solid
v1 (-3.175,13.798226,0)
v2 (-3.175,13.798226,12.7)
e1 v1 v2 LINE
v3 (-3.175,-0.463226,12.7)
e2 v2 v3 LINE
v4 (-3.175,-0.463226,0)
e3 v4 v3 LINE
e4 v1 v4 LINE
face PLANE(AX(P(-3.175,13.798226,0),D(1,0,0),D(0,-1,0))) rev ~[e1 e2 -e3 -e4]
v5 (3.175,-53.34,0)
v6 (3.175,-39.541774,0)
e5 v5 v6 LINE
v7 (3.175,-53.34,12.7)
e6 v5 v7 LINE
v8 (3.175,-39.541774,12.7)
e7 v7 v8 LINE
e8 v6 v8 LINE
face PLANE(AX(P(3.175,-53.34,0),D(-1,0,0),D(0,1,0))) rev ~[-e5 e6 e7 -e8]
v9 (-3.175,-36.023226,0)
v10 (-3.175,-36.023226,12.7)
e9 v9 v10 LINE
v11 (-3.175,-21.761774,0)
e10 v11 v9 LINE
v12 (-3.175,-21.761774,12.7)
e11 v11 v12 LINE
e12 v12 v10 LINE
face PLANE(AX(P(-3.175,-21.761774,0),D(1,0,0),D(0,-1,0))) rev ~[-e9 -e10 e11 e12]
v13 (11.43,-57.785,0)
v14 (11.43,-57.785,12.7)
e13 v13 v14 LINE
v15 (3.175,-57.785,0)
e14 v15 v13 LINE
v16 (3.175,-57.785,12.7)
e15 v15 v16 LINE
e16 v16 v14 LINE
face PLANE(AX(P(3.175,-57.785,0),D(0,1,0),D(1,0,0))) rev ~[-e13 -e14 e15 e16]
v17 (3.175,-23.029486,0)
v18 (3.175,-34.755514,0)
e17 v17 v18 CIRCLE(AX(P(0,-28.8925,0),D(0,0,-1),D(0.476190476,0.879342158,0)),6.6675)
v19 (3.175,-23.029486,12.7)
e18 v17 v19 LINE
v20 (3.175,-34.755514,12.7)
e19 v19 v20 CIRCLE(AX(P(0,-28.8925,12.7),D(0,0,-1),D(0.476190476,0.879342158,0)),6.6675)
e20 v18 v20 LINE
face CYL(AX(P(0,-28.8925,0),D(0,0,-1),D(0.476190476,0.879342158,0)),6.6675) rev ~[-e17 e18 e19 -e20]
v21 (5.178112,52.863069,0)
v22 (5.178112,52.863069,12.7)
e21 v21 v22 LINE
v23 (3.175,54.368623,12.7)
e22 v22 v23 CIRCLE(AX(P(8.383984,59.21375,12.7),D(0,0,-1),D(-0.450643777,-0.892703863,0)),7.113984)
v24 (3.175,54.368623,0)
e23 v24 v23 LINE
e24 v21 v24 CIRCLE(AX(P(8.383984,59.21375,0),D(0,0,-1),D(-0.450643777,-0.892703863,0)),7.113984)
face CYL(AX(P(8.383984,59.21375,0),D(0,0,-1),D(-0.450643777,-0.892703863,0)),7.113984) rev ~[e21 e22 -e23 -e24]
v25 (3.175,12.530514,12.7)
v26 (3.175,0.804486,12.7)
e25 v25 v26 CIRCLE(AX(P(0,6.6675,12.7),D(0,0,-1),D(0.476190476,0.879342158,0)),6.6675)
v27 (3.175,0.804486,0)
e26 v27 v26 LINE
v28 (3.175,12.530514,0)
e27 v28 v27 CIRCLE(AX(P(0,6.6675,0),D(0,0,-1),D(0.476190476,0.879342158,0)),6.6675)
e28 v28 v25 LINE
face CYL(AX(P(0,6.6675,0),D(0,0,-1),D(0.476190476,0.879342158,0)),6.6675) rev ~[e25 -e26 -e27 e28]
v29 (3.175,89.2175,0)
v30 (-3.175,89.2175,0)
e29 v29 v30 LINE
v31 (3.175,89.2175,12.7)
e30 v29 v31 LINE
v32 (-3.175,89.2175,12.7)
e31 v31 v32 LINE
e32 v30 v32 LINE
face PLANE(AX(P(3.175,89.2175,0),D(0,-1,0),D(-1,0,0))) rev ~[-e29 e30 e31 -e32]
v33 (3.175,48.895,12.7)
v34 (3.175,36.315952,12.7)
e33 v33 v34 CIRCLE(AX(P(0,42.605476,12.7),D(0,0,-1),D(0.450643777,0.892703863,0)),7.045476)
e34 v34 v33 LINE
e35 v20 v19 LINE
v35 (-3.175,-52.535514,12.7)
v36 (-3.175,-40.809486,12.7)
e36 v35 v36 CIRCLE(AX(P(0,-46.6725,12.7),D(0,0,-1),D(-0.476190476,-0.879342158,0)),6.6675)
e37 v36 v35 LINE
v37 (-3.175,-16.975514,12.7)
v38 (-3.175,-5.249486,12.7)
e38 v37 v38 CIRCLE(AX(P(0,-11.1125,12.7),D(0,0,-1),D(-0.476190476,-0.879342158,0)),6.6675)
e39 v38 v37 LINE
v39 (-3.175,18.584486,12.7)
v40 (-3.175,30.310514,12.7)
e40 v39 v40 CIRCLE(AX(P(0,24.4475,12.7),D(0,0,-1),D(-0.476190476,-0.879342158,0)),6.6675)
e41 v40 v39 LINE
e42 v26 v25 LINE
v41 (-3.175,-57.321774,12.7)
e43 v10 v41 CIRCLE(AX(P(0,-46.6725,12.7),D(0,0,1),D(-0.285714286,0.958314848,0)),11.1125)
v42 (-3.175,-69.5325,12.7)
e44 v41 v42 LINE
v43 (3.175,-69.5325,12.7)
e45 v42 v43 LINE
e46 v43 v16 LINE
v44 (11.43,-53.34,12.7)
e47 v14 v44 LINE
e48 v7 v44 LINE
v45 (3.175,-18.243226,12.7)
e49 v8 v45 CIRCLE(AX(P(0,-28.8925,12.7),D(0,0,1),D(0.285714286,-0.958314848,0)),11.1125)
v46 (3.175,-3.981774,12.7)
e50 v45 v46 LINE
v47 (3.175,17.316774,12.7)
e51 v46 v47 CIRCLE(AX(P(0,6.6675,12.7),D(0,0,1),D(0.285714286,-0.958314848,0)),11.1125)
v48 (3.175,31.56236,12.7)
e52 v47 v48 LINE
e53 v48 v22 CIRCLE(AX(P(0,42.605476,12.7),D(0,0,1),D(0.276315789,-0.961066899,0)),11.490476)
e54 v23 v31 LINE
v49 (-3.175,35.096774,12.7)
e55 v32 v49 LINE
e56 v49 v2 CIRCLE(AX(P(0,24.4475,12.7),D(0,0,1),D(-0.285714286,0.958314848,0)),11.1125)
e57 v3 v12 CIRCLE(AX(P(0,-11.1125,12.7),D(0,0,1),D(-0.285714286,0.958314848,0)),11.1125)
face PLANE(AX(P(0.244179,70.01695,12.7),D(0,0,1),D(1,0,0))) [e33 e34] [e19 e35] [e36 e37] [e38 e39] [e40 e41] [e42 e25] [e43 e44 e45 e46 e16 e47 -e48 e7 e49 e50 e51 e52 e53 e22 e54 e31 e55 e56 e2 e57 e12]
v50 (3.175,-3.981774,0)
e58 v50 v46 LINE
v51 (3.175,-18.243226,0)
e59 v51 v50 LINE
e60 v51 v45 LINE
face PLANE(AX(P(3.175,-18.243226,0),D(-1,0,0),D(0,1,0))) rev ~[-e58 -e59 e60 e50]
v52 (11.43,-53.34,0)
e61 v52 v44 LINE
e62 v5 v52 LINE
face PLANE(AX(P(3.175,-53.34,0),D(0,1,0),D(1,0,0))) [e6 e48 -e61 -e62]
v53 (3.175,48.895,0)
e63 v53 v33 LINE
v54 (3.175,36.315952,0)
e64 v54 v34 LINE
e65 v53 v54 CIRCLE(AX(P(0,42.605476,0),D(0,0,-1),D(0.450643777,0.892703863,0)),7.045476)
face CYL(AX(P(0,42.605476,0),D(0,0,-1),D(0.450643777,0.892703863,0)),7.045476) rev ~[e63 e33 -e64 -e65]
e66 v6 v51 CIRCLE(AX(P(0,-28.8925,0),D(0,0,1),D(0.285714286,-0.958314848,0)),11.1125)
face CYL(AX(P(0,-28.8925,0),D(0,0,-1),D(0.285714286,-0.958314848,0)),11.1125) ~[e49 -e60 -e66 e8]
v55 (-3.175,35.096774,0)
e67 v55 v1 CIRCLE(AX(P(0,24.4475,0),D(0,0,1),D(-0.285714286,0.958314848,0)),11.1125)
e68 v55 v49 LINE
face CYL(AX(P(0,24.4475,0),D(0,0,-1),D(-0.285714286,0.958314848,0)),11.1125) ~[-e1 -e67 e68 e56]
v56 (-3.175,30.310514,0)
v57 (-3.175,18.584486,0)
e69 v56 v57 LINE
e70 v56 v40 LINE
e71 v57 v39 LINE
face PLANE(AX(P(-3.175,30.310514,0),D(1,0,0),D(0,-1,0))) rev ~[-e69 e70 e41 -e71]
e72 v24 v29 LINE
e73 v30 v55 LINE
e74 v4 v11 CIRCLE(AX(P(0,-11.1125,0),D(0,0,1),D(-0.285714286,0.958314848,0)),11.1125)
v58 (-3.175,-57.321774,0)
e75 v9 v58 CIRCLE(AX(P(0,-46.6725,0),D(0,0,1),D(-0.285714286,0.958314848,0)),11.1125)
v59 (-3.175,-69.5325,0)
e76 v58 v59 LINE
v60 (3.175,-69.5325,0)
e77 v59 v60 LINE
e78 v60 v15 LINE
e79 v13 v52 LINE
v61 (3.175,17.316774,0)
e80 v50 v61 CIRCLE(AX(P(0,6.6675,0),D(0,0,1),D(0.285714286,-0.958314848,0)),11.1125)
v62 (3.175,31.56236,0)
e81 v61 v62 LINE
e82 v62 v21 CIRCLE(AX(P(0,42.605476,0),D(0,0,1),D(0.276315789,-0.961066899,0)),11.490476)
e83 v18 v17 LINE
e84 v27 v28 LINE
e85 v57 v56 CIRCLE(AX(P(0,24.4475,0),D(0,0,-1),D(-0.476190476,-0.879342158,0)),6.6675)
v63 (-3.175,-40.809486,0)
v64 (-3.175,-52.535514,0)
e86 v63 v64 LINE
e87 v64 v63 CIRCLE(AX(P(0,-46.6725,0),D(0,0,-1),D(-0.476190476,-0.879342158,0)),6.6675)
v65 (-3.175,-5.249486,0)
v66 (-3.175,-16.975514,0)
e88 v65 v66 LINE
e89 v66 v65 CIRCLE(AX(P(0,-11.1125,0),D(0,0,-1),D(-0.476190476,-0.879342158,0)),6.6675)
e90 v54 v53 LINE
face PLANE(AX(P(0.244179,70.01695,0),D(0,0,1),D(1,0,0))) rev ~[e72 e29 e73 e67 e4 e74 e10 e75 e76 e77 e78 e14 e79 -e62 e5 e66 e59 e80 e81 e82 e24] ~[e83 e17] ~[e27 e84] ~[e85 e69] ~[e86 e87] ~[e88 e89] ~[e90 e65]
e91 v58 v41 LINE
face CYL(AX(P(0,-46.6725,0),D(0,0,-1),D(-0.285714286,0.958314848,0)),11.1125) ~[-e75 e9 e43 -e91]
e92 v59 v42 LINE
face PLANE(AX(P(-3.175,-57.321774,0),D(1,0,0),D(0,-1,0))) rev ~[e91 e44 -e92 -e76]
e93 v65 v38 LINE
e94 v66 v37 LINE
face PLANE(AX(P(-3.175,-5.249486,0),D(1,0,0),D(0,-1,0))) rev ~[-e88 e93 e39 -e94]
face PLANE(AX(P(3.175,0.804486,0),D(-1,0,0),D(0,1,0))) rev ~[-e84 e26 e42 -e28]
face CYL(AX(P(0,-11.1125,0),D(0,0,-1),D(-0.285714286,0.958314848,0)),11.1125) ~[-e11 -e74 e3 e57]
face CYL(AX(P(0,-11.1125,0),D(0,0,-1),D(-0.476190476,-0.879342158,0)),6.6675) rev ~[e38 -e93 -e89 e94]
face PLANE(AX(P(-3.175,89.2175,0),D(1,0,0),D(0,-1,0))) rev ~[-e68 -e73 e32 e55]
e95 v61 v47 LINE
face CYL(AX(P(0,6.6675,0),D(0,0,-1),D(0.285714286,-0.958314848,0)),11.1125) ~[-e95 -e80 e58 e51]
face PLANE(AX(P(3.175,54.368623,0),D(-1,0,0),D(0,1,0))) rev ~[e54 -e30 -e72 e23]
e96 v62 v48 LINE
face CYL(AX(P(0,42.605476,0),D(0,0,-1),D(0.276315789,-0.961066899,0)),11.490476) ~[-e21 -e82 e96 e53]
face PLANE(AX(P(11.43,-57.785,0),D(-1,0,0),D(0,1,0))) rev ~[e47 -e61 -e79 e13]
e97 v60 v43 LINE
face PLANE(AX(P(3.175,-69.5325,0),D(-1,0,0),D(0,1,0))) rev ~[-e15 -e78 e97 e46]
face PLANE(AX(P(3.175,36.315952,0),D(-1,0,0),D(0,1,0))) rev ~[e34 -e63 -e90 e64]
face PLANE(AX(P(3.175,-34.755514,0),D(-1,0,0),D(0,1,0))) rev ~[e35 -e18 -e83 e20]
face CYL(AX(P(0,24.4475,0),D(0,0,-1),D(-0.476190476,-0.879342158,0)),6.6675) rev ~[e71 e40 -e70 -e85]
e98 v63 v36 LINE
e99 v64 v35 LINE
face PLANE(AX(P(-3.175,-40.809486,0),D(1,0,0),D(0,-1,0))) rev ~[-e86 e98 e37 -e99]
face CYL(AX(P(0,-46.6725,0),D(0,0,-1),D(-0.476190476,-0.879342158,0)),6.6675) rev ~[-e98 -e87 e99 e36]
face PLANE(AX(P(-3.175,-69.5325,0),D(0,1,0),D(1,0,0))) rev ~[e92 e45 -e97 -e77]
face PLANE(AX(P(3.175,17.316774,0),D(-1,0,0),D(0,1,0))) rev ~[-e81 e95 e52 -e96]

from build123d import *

# Parameters (mm, degrees)
F0_W     = 8.255
F0_H     = 4.445
F1_DEPTH = 12.7


with BuildPart() as f1:
    # F0 (on Top) → F1 (new body)
    with BuildSketch(Plane.XY):
        with BuildLine():
            Line((3.175, 89.2175), (-3.175, 89.2175))
            Line((-3.175, 89.2175), (-3.175, 59.21375))
            ThreePointArc((-3.175, 59.21375), (-1.4603208006, 53.1557160458), (3.175, 48.895))
            Line((3.175, 48.895), (3.175, 54.3686230183))
            Line((3.175, 54.3686230183), (3.175, 89.2175))
        make_face()
        with BuildLine():
            ThreePointArc((3.175, 48.895), (-1.4603208006, 53.1557160458), (-3.175, 59.21375))
            Line((-3.175, 59.21375), (-3.175, 35.0967737428))
            ThreePointArc((-3.175, 35.0967737428), (-1.6043069816, 35.4435836373), (0, 35.56))
            ThreePointArc((0, 35.56), (1.6318769104, 35.751593167), (3.175, 36.315952381))
            Line((3.175, 36.315952381), (3.175, 48.895))
        make_face()
        with BuildLine():
            ThreePointArc((5.178111588, 52.8630686695), (4.1097442392, 53.5269543338), (3.175, 54.3686230183))
            Line((3.175, 54.3686230183), (3.175, 48.895))
            ThreePointArc((3.175, 48.895), (7.0454761905, 42.6054761905), (3.175, 36.315952381))
            Line((3.175, 36.315952381), (3.175, 31.5623598693))
            ThreePointArc((3.175, 31.5623598693), (11.4400029348, 41.5296621103), (5.178111588, 52.8630686695))
        make_face()
        with BuildLine():
            ThreePointArc((0, 35.56), (-1.6043069816, 35.4435836373), (-3.175, 35.0967737428))
            Line((-3.175, 35.0967737428), (-3.175, 30.3105138368))
            ThreePointArc((-3.175, 30.3105138368), (-1.6376677767, 30.9107499954), (0, 31.115))
            ThreePointArc((0, 31.115), (1.6031808891, 31.2273896149), (3.175, 31.5623598693))
            Line((3.175, 31.5623598693), (3.175, 36.315952381))
            ThreePointArc((3.175, 36.315952381), (1.6318769104, 35.751593167), (0, 35.56))
        make_face()
        with BuildLine():
            Line((-3.175, 30.3105138368), (-3.175, 35.0967737428))
            ThreePointArc((-3.175, 35.0967737428), (-11.1125, 24.4475), (-3.175, 13.7982262572))
            Line((-3.175, 13.7982262572), (-3.175, 18.5844861632))
            ThreePointArc((-3.175, 18.5844861632), (-6.6675, 24.4475), (-3.175, 30.3105138368))
        make_face()
        with BuildLine():
            ThreePointArc((0, 31.115), (-1.6376677767, 30.9107499954), (-3.175, 30.3105138368))
            Line((-3.175, 30.3105138368), (-3.175, 18.5844861632))
            ThreePointArc((-3.175, 18.5844861632), (-1.6376677767, 17.9842500046), (0, 17.78))
            ThreePointArc((0, 17.78), (1.6043069816, 17.6635836373), (3.175, 17.3167737428))
            Line((3.175, 17.3167737428), (3.175, 31.5623598693))
            ThreePointArc((3.175, 31.5623598693), (1.6031808891, 31.2273896149), (0, 31.115))
        make_face()
        with BuildLine():
            ThreePointArc((0, 13.335), (-1.6043069816, 13.4514163627), (-3.175, 13.7982262572))
            Line((-3.175, 13.7982262572), (-3.175, -0.4632262572))
            ThreePointArc((-3.175, -0.4632262572), (-1.6043069816, -0.1164163627), (0, 0))
            ThreePointArc((0, 0), (1.6376677767, 0.2042500046), (3.175, 0.8044861632))
            Line((3.175, 0.8044861632), (3.175, 12.5305138368))
            ThreePointArc((3.175, 12.5305138368), (1.6376677767, 13.1307499954), (0, 13.335))
        make_face()
        with BuildLine():
            Line((-3.175, 18.5844861632), (-3.175, 13.7982262572))
            ThreePointArc((-3.175, 13.7982262572), (-1.6043069816, 13.4514163627), (0, 13.335))
            ThreePointArc((0, 13.335), (1.6376677767, 13.1307499954), (3.175, 12.5305138368))
            Line((3.175, 12.5305138368), (3.175, 17.3167737428))
            ThreePointArc((3.175, 17.3167737428), (1.6043069816, 17.6635836373), (0, 17.78))
            ThreePointArc((0, 17.78), (-1.6376677767, 17.9842500046), (-3.175, 18.5844861632))
        make_face()
        with BuildLine():
            ThreePointArc((0, 0), (-1.6043069816, -0.1164163627), (-3.175, -0.4632262572))
            Line((-3.175, -0.4632262572), (-3.175, -5.2494861632))
            ThreePointArc((-3.175, -5.2494861632), (-1.6376677767, -4.6492500046), (0, -4.445))
            ThreePointArc((0, -4.445), (1.6043069816, -4.3285836373), (3.175, -3.9817737428))
            Line((3.175, -3.9817737428), (3.175, 0.8044861632))
            ThreePointArc((3.175, 0.8044861632), (1.6376677767, 0.2042500046), (0, 0))
        make_face()
        with BuildLine():
            Line((-3.175, -5.2494861632), (-3.175, -0.4632262572))
            ThreePointArc((-3.175, -0.4632262572), (-11.1125, -11.1125), (-3.175, -21.7617737428))
            Line((-3.175, -21.7617737428), (-3.175, -16.9755138368))
            ThreePointArc((-3.175, -16.9755138368), (-6.6675, -11.1125), (-3.175, -5.2494861632))
        make_face()
        with BuildLine():
            ThreePointArc((3.175, -3.9817737428), (11.1125, 6.6675), (3.175, 17.3167737428))
            Line((3.175, 17.3167737428), (3.175, 12.5305138368))
            ThreePointArc((3.175, 12.5305138368), (6.6675, 6.6675), (3.175, 0.8044861632))
            Line((3.175, 0.8044861632), (3.175, -3.9817737428))
        make_face()
        with BuildLine():
            ThreePointArc((0, -4.445), (-1.6376677767, -4.6492500046), (-3.175, -5.2494861632))
            Line((-3.175, -5.2494861632), (-3.175, -16.9755138368))
            ThreePointArc((-3.175, -16.9755138368), (-1.6376677767, -17.5757499954), (0, -17.78))
            ThreePointArc((0, -17.78), (1.6043069816, -17.8964163627), (3.175, -18.2432262572))
            Line((3.175, -18.2432262572), (3.175, -3.9817737428))
            ThreePointArc((3.175, -3.9817737428), (1.6043069816, -4.3285836373), (0, -4.445))
        make_face()
        with BuildLine():
            ThreePointArc((0, -22.225), (-1.6043069816, -22.1085836373), (-3.175, -21.7617737428))
            Line((-3.175, -21.7617737428), (-3.175, -36.0232262572))
            ThreePointArc((-3.175, -36.0232262572), (-1.6043069816, -35.6764163627), (0, -35.56))
            ThreePointArc((0, -35.56), (1.6376677767, -35.3557499954), (3.175, -34.7555138368))
            Line((3.175, -34.7555138368), (3.175, -23.0294861632))
            ThreePointArc((3.175, -23.0294861632), (1.6376677767, -22.4292500046), (0, -22.225))
        make_face()
        with BuildLine():
            Line((-3.175, -16.9755138368), (-3.175, -21.7617737428))
            ThreePointArc((-3.175, -21.7617737428), (-1.6043069816, -22.1085836373), (0, -22.225))
            ThreePointArc((0, -22.225), (1.6376677767, -22.4292500046), (3.175, -23.0294861632))
            Line((3.175, -23.0294861632), (3.175, -18.2432262572))
            ThreePointArc((3.175, -18.2432262572), (1.6043069816, -17.8964163627), (0, -17.78))
            ThreePointArc((0, -17.78), (-1.6376677767, -17.5757499954), (-3.175, -16.9755138368))
        make_face()
        with BuildLine():
            ThreePointArc((0, -35.56), (-1.6043069816, -35.6764163627), (-3.175, -36.0232262572))
            Line((-3.175, -36.0232262572), (-3.175, -40.8094861632))
            ThreePointArc((-3.175, -40.8094861632), (-1.6376677767, -40.2092500046), (0, -40.005))
            ThreePointArc((0, -40.005), (1.6043069816, -39.8885836373), (3.175, -39.5417737428))
            Line((3.175, -39.5417737428), (3.175, -34.7555138368))
            ThreePointArc((3.175, -34.7555138368), (1.6376677767, -35.3557499954), (0, -35.56))
        make_face()
        with BuildLine():
            Line((-3.175, -40.8094861632), (-3.175, -36.0232262572))
            ThreePointArc((-3.175, -36.0232262572), (-11.1125, -46.6725), (-3.175, -57.3217737428))
            Line((-3.175, -57.3217737428), (-3.175, -52.5355138368))
            ThreePointArc((-3.175, -52.5355138368), (-6.6675, -46.6725), (-3.175, -40.8094861632))
        make_face()
        with BuildLine():
            ThreePointArc((3.175, -39.5417737428), (11.1125, -28.8925), (3.175, -18.2432262572))
            Line((3.175, -18.2432262572), (3.175, -23.0294861632))
            ThreePointArc((3.175, -23.0294861632), (6.6675, -28.8925), (3.175, -34.7555138368))
            Line((3.175, -34.7555138368), (3.175, -39.5417737428))
        make_face()
        with BuildLine():
            ThreePointArc((0, -40.005), (-1.6376677767, -40.2092500046), (-3.175, -40.8094861632))
            Line((-3.175, -40.8094861632), (-3.175, -52.5355138368))
            ThreePointArc((-3.175, -52.5355138368), (-1.6376677767, -53.1357499954), (0, -53.34))
            Line((0, -53.34), (3.175, -53.34))
            Line((3.175, -53.34), (3.175, -39.5417737428))
            ThreePointArc((3.175, -39.5417737428), (1.6043069816, -39.8885836373), (0, -40.005))
        make_face()
        with BuildLine():
            ThreePointArc((0, -57.785), (-1.6043069816, -57.6685836373), (-3.175, -57.3217737428))
            Line((-3.175, -57.3217737428), (-3.175, -69.5325))
            Line((-3.175, -69.5325), (3.175, -69.5325))
            Line((3.175, -69.5325), (3.175, -57.785))
            Line((3.175, -57.785), (0, -57.785))
        make_face()
        with BuildLine():
            Line((-3.175, -52.5355138368), (-3.175, -57.3217737428))
            ThreePointArc((-3.175, -57.3217737428), (-1.6043069816, -57.6685836373), (0, -57.785))
            Line((0, -57.785), (3.175, -57.785))
            Line((3.175, -57.785), (3.175, -53.34))
            Line((3.175, -53.34), (0, -53.34))
            ThreePointArc((0, -53.34), (-1.6376677767, -53.1357499954), (-3.175, -52.5355138368))
        make_face()
        with Locations((7.3025, -55.5625)):
            Rectangle(F0_W, F0_H)
    extrude(amount=F1_DEPTH)


solid = f1.part
